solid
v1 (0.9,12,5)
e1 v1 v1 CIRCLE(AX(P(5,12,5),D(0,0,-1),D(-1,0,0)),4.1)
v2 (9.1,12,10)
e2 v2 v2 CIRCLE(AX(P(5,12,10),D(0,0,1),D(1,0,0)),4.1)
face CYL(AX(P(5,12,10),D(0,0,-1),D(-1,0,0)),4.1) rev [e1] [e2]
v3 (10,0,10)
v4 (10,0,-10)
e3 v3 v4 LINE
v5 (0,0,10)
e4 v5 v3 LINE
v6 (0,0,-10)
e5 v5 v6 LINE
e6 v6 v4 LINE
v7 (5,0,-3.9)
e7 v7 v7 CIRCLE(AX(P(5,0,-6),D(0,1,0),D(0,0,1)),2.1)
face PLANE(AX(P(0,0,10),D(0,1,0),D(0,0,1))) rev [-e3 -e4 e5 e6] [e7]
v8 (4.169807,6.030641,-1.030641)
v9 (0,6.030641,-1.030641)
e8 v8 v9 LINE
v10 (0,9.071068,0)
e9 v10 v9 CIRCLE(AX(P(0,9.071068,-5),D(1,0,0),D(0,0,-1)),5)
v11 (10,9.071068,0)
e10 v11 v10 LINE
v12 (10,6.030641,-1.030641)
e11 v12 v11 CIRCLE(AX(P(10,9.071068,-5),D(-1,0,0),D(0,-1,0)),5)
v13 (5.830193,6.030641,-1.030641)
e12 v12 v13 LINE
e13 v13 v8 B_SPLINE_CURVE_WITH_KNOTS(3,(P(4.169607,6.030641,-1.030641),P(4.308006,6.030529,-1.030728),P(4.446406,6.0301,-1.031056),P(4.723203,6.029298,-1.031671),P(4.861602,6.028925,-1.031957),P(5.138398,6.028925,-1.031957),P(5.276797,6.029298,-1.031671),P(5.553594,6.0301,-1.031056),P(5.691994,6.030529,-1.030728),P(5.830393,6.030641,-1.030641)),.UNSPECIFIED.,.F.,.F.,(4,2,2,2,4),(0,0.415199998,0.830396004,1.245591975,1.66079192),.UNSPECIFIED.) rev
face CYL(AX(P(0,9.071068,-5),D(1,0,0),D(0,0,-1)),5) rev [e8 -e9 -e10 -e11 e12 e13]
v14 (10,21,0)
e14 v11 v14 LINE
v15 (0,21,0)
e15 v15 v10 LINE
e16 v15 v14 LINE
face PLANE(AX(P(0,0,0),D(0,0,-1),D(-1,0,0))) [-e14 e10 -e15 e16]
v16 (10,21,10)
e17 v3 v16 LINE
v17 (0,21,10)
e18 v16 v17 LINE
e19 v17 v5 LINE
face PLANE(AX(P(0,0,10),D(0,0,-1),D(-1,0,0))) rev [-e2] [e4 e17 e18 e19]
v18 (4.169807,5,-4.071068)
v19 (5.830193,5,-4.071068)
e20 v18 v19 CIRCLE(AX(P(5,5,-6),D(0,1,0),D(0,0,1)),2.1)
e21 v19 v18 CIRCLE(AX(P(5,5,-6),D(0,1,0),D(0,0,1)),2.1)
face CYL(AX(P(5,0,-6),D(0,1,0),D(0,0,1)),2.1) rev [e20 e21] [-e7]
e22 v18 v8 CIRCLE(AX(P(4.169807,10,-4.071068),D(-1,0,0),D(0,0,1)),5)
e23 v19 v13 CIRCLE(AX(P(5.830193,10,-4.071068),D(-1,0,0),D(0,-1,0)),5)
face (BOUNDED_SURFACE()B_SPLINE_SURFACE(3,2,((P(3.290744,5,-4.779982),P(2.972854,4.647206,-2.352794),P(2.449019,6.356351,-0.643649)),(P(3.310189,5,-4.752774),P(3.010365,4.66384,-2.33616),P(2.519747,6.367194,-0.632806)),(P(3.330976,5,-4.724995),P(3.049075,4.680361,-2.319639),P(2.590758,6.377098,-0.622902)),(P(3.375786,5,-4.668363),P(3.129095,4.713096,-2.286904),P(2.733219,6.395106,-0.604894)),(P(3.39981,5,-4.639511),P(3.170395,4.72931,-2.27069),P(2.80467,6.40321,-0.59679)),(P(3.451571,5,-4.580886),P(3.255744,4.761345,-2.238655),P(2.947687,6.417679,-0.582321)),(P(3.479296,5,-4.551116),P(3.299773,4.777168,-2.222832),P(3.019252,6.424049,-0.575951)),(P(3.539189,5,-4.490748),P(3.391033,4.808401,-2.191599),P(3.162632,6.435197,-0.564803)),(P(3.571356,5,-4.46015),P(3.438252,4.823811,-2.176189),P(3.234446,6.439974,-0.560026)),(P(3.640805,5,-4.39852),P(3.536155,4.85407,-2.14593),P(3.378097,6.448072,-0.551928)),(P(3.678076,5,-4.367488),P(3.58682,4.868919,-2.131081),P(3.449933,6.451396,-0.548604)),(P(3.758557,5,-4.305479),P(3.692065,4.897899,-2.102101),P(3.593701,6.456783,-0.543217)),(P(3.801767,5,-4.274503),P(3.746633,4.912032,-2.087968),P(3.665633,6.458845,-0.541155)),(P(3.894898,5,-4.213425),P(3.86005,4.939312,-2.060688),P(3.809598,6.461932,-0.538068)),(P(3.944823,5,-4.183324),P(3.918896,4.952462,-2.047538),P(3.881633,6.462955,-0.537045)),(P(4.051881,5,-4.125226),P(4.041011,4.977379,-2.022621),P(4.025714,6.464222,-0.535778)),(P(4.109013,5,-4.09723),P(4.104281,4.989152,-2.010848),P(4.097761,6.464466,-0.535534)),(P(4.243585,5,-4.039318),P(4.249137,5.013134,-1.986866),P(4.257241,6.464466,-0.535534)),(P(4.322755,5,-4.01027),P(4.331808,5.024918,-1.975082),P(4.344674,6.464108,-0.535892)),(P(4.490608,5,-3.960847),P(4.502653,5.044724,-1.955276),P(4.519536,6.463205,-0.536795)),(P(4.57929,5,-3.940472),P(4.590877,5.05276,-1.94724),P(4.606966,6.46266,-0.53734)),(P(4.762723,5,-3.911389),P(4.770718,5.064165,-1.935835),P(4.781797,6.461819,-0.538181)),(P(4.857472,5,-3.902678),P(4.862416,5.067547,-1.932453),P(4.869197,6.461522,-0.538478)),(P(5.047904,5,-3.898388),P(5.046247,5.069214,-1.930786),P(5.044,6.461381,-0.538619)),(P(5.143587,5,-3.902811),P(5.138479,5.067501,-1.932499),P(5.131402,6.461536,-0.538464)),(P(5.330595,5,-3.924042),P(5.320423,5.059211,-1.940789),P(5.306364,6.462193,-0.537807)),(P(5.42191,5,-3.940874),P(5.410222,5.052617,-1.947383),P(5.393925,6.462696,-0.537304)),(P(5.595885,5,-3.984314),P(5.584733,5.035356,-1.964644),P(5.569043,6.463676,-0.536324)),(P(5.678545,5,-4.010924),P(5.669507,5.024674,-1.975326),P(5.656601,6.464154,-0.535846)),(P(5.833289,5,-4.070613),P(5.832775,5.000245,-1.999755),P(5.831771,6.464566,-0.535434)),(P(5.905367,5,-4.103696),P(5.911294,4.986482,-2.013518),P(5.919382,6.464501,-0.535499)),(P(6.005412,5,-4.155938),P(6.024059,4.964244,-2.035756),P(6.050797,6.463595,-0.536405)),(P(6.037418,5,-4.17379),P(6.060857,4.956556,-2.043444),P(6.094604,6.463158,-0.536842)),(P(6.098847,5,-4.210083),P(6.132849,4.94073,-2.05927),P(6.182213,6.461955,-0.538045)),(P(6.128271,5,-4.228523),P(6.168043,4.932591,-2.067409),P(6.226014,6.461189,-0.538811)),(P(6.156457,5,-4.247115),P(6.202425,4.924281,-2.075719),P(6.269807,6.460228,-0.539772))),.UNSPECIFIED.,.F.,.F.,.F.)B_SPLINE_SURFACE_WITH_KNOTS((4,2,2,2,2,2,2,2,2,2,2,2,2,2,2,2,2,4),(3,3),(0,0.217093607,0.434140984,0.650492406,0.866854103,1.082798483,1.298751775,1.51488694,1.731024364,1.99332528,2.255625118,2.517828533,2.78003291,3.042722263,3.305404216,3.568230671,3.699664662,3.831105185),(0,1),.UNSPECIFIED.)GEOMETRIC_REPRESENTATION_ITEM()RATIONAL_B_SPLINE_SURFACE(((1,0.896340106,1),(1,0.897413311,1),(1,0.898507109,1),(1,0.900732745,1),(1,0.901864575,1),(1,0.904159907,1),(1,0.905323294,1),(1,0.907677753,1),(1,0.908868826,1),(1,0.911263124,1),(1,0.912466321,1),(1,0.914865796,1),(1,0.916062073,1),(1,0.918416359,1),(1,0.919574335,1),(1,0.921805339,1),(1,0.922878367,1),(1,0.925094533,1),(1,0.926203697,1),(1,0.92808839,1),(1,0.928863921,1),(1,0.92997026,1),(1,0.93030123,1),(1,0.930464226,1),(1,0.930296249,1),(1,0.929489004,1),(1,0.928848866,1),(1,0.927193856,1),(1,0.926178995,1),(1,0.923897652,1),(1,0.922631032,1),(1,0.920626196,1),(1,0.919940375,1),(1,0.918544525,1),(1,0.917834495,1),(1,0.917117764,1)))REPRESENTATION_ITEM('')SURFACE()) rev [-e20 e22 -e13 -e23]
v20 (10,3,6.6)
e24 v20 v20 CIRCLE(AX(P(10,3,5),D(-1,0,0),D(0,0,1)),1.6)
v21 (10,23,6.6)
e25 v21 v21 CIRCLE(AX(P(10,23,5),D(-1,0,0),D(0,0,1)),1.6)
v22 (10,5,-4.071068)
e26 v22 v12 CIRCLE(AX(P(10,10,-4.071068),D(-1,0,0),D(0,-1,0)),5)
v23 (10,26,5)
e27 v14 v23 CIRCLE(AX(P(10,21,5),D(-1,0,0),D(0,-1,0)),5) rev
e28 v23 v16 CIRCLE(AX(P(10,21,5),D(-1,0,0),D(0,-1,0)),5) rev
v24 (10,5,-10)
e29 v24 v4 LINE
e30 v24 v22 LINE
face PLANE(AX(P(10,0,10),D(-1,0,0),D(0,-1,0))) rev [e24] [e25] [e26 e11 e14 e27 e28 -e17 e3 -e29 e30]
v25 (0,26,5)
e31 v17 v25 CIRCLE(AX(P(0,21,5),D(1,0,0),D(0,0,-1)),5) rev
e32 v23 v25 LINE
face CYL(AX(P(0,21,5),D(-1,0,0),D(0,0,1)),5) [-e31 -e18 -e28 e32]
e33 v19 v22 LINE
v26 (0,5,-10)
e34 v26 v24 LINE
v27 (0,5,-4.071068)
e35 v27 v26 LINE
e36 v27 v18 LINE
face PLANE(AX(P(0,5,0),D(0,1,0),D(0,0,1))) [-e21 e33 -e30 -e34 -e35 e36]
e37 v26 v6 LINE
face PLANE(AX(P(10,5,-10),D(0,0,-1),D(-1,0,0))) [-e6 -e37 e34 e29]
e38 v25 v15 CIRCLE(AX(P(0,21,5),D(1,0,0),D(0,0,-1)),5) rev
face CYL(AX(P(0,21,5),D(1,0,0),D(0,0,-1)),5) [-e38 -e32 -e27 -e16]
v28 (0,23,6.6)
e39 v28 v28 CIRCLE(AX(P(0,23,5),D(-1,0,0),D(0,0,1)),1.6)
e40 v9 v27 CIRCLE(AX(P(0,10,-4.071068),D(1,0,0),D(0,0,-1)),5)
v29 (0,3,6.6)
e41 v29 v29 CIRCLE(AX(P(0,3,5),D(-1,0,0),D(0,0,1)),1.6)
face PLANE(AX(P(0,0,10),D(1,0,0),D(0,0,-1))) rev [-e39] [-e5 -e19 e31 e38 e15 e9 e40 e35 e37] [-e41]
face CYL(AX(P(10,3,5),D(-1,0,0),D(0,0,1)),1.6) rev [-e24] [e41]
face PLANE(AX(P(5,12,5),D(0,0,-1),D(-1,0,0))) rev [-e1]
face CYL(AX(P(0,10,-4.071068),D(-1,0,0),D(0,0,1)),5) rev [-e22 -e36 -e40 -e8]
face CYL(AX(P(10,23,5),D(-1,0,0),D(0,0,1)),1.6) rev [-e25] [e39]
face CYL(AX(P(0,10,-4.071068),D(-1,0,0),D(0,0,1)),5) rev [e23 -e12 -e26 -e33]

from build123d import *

# Parameters (mm, degrees)
ESQUISSE1_W             = 10
ESQUISSE1_H             = 26
ESQUISSE1_R             = 4.1
BOSS_EXTRU_1_DEPTH      = 10
ESQUISSE2_R             = 1.6
ENL_V_MAT_EXTRU_1_DEPTH = 10
ESQUISSE3_W             = 10
ESQUISSE3_H             = 10
BOSS_EXTRU_2_DEPTH      = 5
CHANFREIN1_SIZE         = 2
ESQUISSE4_R             = 2.1
ENL_V_MAT_EXTRU_2_DEPTH = 5
ESQUISSE5_R             = 4.106671815
BOSS_EXTRU_3_DEPTH      = 5
CONG_1_R                = 5


# Some blends are built 0.0001 mm under size
with BuildPart() as part:
    # Esquisse1 → Boss.-Extru.1 (new body)
    with BuildSketch(Plane.XY):
        with Locations((5, 13)):
            Rectangle(ESQUISSE1_W, ESQUISSE1_H)
        with Locations((5, 12)):
            Circle(ESQUISSE1_R, mode=Mode.SUBTRACT)
    extrude(amount=BOSS_EXTRU_1_DEPTH)

    # Esquisse2 → Enlèv. mat.-Extru.1 (cut)
    with BuildSketch(Plane.ZY):
        with Locations((5, 23)):
            Circle(ESQUISSE2_R)
        with Locations((5, 3)):
            Circle(ESQUISSE2_R)
    extrude(amount=-ENL_V_MAT_EXTRU_1_DEPTH, mode=Mode.SUBTRACT)

    # Esquisse3 → Boss.-Extru.2 (add)
    with BuildSketch(Plane.XZ):
        with Locations((5, -5)):
            Rectangle(ESQUISSE3_W, ESQUISSE3_H)
    extrude(amount=-BOSS_EXTRU_2_DEPTH)

    # Chanfrein1
    chanfrein1_edges = [part.edges().sort_by_distance(p)[0] for p in [
        (5, 5, 0),
    ]]
    chamfer(chanfrein1_edges, length=CHANFREIN1_SIZE)

    # Esquisse4 → Enlèv. mat.-Extru.2 (cut)
    with BuildSketch(Plane(origin=(0, 5, 0), x_dir=(1, 0, 0), z_dir=(0, 1, 0))):
        with Locations(Location((5, 6, 0), (0, 0, 270))):
            Circle(ESQUISSE4_R)
    extrude(amount=-ENL_V_MAT_EXTRU_2_DEPTH, mode=Mode.SUBTRACT)

    # Esquisse5 → Boss.-Extru.3 (add)
    with BuildSketch(Plane(origin=(0, 0, 0), x_dir=(-1, 0, 0), z_dir=(0, 0, -1))):
        with Locations((-5, 12)):
            Circle(ESQUISSE5_R)
    extrude(amount=-BOSS_EXTRU_3_DEPTH)

    # Congé1
    cong_1_edges = [part.edges().sort_by_distance(p)[0] for p in [
        (5, 5, -2),
    ]]
    fillet(cong_1_edges, radius=CONG_1_R)
    cong_1_2_edges = [part.edges().sort_by_distance(p)[0] for p in [
        (5, 26, 0),
    ]]
    fillet(cong_1_2_edges, radius=CONG_1_R)
    cong_1_3_edges = [part.edges().sort_by_distance(p)[0] for p in [
        (5, 26, 10),
    ]]
    fillet(cong_1_3_edges, radius=CONG_1_R - 0.0001)  # a hair under: the kernel refuses the full size
    # the kernel refuses this fillet: 5 mm, written as the material it adds along each edge
    with BuildSketch(Plane(origin=(10, 7, 0), x_dir=(0, 1, 0), z_dir=(-1, 0, 0))) as cong_1_4_piece_1:
        with BuildLine():
            CenterArc((CONG_1_R * 0.414213562373, CONG_1_R), CONG_1_R, 225, 45)
            Line((-CONG_1_R * 0.292893218813, CONG_1_R * 0.292893218813), (-CONG_1_R * 0.307035354437, CONG_1_R * 0.27875108319))
            Line((-CONG_1_R * 0.307035354437, CONG_1_R * 0.27875108319), (-CONG_1_R * 0.00828427124746, -CONG_1_R * 0.02))
            Line((-CONG_1_R * 0.00828427124746, -CONG_1_R * 0.02), (CONG_1_R * 0.414213562373, -CONG_1_R * 0.02))
            Line((CONG_1_R * 0.414213562373, -CONG_1_R * 0.02), (CONG_1_R * 0.414213562373, 0))
        make_face()
    extrude(amount=10)


solid = part.part
